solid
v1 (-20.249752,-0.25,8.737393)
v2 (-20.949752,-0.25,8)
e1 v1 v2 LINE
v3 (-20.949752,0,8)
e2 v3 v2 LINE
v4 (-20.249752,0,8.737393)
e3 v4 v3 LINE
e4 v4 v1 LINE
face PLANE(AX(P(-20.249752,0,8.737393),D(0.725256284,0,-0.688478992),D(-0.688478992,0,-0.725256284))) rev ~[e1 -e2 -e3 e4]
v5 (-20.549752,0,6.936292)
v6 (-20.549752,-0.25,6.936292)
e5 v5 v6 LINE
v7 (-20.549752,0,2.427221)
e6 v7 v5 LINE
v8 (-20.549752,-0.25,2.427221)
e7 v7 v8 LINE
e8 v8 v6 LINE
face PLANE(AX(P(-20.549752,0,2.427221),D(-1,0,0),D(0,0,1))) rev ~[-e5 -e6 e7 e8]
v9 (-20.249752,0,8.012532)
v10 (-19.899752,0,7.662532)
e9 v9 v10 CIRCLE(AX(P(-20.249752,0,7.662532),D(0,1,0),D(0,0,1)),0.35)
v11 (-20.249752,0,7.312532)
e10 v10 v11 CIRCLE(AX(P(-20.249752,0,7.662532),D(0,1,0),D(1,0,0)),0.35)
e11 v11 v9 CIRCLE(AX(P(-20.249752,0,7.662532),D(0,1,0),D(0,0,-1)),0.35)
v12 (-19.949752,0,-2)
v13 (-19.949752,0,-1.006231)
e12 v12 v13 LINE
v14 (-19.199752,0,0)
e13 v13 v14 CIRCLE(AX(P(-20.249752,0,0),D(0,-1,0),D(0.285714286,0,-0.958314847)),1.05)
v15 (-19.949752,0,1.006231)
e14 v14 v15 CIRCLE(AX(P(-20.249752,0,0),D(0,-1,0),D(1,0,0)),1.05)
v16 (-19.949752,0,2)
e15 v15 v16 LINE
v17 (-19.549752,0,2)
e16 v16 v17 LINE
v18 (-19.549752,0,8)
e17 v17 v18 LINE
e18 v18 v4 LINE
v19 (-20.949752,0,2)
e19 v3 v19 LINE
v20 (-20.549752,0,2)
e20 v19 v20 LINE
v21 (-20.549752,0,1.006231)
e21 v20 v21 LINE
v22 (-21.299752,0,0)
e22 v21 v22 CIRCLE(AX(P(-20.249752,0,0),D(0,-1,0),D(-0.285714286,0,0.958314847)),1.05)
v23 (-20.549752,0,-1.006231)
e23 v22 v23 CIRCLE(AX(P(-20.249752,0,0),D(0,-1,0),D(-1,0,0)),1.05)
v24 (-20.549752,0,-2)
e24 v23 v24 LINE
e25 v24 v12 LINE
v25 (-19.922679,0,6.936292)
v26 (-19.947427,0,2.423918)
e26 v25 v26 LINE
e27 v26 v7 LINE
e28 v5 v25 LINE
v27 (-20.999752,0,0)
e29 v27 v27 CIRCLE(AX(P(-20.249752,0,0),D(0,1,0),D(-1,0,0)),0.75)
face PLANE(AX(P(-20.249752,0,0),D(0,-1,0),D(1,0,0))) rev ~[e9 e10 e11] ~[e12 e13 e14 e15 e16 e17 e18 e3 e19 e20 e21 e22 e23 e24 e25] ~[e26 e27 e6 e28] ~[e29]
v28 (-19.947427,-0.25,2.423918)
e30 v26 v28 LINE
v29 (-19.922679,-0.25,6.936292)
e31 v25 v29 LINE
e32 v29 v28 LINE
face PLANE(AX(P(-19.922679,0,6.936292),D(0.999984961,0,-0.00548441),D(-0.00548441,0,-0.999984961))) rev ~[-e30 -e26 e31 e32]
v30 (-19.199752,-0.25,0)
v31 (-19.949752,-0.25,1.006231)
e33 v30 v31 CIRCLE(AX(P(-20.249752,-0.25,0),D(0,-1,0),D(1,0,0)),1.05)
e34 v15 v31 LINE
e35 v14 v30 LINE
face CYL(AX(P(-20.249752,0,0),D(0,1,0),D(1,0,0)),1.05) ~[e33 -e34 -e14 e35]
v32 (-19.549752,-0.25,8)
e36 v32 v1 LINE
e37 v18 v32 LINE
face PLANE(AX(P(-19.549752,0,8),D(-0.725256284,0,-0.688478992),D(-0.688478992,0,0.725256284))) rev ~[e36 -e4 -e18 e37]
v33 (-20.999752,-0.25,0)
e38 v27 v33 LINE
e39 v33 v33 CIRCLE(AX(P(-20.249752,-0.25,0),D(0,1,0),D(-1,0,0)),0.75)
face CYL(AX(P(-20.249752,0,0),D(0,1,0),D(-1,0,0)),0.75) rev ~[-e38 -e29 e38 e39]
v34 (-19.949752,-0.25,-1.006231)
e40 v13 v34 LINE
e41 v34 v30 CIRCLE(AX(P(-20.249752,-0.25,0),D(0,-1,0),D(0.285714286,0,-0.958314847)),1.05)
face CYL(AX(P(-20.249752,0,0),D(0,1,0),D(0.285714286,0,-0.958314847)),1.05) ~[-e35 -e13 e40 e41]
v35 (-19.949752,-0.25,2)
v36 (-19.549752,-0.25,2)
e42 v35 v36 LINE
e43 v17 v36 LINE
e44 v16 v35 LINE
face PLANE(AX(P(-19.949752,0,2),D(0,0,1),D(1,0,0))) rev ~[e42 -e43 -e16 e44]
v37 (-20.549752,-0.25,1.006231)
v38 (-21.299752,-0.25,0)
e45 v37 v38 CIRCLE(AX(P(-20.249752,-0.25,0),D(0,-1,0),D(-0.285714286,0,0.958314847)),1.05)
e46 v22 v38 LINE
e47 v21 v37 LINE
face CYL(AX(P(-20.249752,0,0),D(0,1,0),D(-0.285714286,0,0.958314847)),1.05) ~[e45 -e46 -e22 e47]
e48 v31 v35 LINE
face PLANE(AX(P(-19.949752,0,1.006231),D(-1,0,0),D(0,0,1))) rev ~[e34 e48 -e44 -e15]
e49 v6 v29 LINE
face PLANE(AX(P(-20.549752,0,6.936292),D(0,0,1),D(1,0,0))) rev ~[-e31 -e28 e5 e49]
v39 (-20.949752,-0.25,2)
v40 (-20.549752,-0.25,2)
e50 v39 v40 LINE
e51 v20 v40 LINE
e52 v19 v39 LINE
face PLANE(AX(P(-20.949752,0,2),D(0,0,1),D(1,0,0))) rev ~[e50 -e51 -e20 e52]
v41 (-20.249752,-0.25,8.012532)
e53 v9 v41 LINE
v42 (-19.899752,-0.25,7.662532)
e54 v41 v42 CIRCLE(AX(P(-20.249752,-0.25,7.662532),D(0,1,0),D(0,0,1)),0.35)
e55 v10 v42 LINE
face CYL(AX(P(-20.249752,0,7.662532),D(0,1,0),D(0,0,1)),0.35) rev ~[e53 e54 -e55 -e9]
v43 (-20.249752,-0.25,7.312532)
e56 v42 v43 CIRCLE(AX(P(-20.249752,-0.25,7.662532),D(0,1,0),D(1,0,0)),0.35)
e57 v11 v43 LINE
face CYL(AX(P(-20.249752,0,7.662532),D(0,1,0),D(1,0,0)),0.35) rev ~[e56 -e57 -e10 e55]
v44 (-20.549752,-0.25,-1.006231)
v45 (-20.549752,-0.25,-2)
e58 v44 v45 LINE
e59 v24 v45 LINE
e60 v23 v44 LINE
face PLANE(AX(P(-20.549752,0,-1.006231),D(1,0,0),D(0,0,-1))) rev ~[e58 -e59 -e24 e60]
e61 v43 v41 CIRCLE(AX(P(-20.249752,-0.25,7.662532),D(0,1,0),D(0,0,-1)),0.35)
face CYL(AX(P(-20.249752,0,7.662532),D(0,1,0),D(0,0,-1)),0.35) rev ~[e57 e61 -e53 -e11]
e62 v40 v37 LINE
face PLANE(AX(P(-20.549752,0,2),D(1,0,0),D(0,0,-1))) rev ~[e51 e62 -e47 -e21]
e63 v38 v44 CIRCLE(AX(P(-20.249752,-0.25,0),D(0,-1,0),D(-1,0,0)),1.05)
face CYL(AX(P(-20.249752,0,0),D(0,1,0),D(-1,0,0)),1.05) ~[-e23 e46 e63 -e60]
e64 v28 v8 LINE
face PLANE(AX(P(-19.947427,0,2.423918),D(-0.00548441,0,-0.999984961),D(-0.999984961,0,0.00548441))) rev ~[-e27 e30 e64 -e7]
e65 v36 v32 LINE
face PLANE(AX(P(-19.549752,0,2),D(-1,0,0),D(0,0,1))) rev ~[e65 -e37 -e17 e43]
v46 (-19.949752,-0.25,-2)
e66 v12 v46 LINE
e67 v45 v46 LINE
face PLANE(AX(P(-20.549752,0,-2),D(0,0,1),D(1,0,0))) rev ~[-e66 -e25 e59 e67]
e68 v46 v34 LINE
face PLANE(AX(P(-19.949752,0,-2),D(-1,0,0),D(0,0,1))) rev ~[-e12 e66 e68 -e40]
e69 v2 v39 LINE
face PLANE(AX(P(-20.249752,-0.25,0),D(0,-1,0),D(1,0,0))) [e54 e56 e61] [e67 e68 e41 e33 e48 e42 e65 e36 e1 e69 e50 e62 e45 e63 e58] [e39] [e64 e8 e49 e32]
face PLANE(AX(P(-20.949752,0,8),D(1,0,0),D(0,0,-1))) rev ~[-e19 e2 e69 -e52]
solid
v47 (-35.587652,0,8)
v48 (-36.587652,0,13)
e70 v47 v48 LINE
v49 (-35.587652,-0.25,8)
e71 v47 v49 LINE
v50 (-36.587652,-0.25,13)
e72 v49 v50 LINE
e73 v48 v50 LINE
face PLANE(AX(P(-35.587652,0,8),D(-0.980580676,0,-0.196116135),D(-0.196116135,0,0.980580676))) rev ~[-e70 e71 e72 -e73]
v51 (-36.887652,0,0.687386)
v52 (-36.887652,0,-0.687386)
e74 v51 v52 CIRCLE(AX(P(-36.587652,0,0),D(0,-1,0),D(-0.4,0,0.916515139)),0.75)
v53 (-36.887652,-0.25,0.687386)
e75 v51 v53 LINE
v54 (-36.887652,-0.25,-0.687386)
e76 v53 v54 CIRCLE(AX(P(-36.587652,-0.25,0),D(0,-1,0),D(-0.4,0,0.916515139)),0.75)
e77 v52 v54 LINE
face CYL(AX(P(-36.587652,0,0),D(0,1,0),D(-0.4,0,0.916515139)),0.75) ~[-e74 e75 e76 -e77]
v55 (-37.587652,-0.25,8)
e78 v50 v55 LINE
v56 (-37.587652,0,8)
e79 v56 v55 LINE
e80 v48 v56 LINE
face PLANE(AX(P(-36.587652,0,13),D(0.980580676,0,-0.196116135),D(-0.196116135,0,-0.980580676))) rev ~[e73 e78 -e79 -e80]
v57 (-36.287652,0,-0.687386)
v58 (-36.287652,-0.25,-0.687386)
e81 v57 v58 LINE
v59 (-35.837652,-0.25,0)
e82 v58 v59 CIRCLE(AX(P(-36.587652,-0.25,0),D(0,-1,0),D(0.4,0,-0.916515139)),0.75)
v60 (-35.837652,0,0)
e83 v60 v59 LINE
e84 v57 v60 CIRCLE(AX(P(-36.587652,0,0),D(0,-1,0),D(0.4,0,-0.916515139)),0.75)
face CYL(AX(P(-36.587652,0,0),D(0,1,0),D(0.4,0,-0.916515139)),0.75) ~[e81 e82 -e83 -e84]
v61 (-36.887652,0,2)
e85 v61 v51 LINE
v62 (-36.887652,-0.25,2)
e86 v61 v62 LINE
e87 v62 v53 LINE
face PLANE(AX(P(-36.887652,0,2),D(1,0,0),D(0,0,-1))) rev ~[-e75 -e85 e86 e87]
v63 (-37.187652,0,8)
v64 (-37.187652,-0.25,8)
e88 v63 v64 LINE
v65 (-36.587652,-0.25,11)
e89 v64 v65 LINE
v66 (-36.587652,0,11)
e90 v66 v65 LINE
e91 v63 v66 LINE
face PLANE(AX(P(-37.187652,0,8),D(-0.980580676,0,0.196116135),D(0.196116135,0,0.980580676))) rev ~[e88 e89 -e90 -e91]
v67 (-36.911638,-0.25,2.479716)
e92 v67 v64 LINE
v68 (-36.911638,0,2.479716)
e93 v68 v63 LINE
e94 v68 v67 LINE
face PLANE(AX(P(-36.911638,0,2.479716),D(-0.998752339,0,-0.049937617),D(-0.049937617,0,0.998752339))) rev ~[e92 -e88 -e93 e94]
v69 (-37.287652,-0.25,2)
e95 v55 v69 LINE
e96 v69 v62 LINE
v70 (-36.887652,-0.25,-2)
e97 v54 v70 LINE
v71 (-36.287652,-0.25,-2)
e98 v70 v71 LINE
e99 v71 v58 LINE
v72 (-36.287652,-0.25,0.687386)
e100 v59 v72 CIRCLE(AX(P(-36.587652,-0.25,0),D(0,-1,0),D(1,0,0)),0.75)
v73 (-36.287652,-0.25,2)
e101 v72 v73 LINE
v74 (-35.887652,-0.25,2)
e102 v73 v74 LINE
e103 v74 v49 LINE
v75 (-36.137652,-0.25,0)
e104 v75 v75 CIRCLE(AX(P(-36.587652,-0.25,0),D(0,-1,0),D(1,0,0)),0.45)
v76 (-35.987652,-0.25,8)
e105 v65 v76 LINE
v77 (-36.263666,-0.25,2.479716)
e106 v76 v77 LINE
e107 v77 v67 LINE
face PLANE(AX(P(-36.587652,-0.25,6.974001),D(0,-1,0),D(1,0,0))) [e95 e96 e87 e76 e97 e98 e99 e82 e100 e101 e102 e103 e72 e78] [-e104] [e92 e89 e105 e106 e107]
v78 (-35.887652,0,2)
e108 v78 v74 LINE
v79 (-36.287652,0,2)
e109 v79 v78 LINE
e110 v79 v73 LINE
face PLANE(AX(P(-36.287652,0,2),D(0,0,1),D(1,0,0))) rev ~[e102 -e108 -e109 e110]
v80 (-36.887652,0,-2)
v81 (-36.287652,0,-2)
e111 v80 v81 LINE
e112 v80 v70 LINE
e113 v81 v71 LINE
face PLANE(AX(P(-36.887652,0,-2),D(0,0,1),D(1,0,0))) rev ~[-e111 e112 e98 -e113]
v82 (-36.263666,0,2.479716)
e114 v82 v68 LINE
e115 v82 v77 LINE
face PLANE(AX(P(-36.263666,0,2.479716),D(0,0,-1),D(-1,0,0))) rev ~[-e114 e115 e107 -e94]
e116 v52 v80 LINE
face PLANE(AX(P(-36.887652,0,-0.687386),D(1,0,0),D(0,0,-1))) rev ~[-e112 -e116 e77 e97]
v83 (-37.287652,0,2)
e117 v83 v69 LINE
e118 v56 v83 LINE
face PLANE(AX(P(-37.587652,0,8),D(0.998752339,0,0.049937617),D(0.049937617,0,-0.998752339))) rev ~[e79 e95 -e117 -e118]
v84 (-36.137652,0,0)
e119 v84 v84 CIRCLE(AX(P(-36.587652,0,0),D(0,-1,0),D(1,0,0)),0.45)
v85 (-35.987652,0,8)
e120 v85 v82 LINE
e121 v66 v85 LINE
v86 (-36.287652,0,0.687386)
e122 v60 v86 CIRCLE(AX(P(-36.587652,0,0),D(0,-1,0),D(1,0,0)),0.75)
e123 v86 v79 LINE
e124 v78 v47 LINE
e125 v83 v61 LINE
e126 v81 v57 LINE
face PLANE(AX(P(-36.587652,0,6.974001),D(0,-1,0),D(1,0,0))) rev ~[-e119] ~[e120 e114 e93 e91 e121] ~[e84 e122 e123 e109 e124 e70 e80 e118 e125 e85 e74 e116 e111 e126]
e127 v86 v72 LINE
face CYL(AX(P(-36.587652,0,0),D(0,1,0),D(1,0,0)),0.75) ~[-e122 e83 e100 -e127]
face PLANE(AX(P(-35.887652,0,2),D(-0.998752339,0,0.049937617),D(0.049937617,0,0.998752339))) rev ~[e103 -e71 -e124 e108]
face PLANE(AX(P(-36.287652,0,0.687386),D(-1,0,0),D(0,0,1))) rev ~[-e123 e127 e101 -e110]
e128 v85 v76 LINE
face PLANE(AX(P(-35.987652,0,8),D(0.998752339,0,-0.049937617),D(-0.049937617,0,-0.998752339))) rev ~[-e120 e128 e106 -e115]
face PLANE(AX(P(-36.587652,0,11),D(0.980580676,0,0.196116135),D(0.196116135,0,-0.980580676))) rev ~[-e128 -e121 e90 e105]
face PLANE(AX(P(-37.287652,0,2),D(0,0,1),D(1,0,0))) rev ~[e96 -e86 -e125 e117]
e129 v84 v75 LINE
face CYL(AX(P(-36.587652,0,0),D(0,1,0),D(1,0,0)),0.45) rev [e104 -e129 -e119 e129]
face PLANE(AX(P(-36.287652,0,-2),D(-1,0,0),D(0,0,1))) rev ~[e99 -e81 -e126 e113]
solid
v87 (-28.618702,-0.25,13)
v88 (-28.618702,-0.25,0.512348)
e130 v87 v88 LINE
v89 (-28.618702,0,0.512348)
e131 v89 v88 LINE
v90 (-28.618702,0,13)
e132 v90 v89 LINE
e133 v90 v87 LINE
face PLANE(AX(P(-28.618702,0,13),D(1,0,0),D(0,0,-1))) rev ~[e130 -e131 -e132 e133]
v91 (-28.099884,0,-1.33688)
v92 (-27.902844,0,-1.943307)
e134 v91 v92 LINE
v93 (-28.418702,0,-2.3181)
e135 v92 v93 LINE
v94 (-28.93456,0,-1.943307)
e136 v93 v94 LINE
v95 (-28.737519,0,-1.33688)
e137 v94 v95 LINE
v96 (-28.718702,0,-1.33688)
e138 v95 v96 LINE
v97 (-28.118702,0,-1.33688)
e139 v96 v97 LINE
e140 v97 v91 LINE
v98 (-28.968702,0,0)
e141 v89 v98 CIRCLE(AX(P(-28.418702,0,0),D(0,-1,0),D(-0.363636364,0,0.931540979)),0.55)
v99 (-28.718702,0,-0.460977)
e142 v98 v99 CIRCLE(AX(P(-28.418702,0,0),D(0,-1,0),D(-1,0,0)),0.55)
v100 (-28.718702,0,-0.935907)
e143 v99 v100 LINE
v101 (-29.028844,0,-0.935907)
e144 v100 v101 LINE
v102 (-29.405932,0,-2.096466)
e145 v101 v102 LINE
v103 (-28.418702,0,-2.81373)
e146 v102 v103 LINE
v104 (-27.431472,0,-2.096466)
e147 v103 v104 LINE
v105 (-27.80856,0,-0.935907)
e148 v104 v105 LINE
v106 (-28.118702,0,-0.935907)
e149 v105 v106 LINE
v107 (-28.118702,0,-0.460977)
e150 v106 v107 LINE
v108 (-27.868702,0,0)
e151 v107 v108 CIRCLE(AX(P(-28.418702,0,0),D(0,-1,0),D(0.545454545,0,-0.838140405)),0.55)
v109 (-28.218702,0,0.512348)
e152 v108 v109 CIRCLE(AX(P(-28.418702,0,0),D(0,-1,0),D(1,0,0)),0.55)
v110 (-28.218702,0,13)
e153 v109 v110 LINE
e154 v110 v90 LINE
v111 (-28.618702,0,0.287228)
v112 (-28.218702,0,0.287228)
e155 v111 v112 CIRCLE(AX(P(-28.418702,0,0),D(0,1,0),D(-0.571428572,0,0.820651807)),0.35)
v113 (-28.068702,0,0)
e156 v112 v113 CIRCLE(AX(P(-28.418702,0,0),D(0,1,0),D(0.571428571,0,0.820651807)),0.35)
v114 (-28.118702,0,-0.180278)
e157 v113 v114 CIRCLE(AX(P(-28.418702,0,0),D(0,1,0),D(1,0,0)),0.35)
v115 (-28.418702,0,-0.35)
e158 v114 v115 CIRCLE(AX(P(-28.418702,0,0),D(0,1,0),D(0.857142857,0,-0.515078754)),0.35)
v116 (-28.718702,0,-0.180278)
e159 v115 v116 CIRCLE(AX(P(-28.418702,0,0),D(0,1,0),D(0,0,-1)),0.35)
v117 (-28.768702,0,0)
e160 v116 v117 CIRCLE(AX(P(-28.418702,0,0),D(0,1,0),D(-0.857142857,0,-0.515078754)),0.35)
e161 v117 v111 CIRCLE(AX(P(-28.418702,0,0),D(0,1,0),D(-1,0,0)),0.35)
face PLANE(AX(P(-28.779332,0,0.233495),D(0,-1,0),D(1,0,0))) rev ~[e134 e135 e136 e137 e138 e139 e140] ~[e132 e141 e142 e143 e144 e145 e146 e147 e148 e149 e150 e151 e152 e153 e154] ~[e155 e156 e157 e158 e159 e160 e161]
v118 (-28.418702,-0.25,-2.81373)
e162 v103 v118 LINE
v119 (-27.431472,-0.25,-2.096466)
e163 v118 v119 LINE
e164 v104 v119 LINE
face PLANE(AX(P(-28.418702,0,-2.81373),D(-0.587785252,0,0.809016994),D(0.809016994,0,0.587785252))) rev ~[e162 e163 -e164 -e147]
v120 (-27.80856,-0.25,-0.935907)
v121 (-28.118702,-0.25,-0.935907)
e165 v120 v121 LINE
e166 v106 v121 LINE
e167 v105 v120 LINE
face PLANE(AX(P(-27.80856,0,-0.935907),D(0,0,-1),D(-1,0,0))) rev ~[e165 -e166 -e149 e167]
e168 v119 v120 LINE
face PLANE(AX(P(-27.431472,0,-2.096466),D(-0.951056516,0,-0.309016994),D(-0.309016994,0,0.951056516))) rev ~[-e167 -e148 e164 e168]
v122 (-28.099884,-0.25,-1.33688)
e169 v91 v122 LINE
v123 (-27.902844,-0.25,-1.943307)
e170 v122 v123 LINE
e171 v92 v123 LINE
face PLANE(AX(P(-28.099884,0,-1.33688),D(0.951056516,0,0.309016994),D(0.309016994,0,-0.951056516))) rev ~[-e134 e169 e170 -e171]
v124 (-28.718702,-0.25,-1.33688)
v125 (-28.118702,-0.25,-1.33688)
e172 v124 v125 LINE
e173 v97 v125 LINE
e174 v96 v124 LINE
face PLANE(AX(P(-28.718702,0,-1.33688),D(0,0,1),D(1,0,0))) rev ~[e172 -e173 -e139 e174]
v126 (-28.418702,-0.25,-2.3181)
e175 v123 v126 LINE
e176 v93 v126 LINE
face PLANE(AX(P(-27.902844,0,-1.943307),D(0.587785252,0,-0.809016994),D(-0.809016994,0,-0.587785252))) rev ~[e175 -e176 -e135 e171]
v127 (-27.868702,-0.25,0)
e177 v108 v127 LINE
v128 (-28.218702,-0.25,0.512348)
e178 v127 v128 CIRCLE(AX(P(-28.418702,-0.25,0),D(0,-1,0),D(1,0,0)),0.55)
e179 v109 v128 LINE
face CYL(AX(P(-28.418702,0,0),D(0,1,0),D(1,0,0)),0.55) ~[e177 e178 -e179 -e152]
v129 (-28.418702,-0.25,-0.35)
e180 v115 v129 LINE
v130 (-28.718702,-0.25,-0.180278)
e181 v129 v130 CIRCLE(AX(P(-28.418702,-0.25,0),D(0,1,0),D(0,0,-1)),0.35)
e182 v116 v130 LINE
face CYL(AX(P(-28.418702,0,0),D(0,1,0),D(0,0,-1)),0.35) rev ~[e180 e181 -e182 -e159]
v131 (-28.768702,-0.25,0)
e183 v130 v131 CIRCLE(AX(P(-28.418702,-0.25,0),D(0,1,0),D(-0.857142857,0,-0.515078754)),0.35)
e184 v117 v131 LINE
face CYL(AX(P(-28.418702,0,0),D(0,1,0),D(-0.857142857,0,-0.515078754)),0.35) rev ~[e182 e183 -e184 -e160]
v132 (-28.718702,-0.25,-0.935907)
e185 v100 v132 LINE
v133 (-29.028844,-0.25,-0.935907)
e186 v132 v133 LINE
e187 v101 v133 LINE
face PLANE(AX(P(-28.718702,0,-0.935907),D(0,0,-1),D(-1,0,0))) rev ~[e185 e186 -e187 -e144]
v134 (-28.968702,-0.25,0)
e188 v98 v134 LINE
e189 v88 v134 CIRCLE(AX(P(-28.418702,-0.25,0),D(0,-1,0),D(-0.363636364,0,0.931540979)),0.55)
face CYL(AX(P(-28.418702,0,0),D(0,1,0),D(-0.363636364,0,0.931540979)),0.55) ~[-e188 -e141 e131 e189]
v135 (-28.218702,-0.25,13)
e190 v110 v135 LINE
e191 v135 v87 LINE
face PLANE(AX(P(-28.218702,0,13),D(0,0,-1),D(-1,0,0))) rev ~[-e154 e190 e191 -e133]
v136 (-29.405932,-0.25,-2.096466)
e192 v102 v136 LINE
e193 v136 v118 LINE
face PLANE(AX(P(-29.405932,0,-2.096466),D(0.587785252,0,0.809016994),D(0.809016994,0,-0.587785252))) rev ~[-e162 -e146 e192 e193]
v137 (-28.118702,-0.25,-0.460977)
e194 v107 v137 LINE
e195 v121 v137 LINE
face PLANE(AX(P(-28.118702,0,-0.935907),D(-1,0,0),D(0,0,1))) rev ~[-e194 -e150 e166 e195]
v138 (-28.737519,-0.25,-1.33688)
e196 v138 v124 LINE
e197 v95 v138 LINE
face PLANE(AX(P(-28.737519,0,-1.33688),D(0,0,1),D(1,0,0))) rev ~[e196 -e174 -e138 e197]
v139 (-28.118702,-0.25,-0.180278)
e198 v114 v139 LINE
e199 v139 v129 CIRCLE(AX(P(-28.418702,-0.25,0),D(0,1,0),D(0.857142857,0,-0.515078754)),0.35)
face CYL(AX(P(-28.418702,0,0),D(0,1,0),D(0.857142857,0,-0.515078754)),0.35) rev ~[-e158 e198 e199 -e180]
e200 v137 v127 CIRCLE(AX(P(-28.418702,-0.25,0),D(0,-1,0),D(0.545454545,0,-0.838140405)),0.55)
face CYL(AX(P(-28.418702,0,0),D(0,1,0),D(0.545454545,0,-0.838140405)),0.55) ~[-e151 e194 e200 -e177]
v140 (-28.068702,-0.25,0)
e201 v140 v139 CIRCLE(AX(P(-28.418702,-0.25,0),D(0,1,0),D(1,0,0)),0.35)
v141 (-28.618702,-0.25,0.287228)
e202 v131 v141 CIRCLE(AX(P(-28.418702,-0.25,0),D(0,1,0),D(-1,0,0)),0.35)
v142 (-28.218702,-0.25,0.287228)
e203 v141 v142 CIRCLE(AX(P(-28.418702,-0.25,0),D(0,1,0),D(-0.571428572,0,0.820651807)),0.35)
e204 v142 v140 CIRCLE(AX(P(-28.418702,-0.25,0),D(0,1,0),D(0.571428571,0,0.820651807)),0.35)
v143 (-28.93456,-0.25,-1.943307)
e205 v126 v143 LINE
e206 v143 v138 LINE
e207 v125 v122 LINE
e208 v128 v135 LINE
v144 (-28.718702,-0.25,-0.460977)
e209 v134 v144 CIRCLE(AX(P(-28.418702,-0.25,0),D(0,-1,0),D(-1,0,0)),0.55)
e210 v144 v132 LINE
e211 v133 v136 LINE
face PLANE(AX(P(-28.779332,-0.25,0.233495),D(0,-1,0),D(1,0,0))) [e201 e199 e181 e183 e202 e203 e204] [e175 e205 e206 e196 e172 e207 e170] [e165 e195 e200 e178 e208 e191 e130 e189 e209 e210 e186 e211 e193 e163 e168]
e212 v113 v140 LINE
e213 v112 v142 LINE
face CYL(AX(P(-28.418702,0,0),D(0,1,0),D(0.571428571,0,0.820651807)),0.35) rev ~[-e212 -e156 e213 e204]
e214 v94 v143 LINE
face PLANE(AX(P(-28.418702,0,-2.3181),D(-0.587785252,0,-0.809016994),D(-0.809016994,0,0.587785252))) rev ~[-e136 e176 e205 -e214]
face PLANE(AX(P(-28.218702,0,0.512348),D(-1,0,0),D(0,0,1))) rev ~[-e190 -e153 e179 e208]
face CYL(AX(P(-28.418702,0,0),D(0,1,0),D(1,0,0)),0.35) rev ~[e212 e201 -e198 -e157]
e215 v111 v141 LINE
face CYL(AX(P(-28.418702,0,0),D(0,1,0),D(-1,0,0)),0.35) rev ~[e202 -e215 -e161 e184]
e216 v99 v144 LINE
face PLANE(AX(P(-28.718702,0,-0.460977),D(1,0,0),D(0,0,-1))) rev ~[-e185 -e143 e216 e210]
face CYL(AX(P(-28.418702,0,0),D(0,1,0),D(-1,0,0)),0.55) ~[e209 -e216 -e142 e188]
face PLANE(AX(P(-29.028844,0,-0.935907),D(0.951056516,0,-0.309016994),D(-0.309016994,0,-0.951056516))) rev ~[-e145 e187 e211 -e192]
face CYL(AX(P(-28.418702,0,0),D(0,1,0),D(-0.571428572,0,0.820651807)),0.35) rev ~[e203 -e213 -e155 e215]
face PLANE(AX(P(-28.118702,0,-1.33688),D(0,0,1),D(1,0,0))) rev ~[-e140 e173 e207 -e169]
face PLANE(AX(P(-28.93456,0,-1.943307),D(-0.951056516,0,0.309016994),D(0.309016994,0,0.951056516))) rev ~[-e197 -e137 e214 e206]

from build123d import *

# Parameters (mm, degrees)
F1_DEPTH = 0.25
F0_W     = 0.3
F0_H     = 0.4009734839
F0_R     = 0.45


# Not quite as in the source:
# - a feature names something its author has since deleted; it is built from what else it names


with BuildPart() as f1:
    # F0 (on Front) → F1 (new body)
    with BuildSketch(Plane.XZ):
        with BuildLine():
            ThreePointArc((-20.5497518182, 1.0062305899), (-21.0916247302, 0.6274950199), (-21.2997518182, 0))
            ThreePointArc((-21.2997518182, 0), (-21.0916247302, -0.6274950199), (-20.5497518182, -1.0062305899))
            ThreePointArc((-20.5497518182, -1.0062305899), (-20.2497518182, -1.05), (-19.9497518182, -1.0062305899))
            ThreePointArc((-19.9497518182, -1.0062305899), (-19.4078789062, -0.6274950199), (-19.1997518182, 0))
            ThreePointArc((-19.1997518182, 0), (-19.4078789062, 0.6274950199), (-19.9497518182, 1.0062305899))
            ThreePointArc((-19.9497518182, 1.0062305899), (-20.2497518182, 1.05), (-20.5497518182, 1.0062305899))
        make_face()
        with BuildLine():
            ThreePointArc((-19.4997518182, 0), (-20.2497518182, -0.75), (-20.9997518182, 0))
            ThreePointArc((-20.9997518182, 0), (-20.2497518182, 0.75), (-19.4997518182, 0))
        make_face(mode=Mode.SUBTRACT)
        with BuildLine():
            Line((-20.5497518182, 2), (-20.5497518182, 1.0062305899))
            ThreePointArc((-20.5497518182, 1.0062305899), (-20.2497518182, 1.05), (-19.9497518182, 1.0062305899))
            Line((-19.9497518182, 1.0062305899), (-19.9497518182, 2))
            Line((-19.9497518182, 2), (-19.9474268439, 2.4239178289))
            Line((-19.9474268439, 2.4239178289), (-20.5497518182, 2.4272212759))
            Line((-20.5497518182, 2.4272212759), (-20.5497518182, 2))
        make_face()
        with BuildLine():
            ThreePointArc((-19.9497518182, -1.0062305899), (-20.2497518182, -1.05), (-20.5497518182, -1.0062305899))
            Line((-20.5497518182, -1.0062305899), (-20.5497518182, -2))
            Line((-20.5497518182, -2), (-19.9497518182, -2))
            Line((-19.9497518182, -2), (-19.9497518182, -1.0062305899))
        make_face()
        with BuildLine():
            Line((-20.9497518182, 2), (-20.5497518182, 2))
            Line((-20.5497518182, 2), (-20.5497518182, 2.4272212759))
            Line((-20.5497518182, 2.4272212759), (-20.5497518182, 6.936291784))
            Line((-20.5497518182, 6.936291784), (-20.2497518182, 6.936291784))
            Line((-20.2497518182, 6.936291784), (-20.2497518182, 7.3125319198))
            ThreePointArc((-20.2497518182, 7.3125319198), (-20.5997518182, 7.6625319198), (-20.2497518182, 8.0125319198))
            Line((-20.2497518182, 8.0125319198), (-20.2497518182, 8.7373927236))
            Line((-20.2497518182, 8.7373927236), (-20.9497518182, 8))
            Line((-20.9497518182, 8), (-20.9497518182, 2))
        make_face()
        with BuildLine():
            Line((-19.9474268439, 2.4239178289), (-19.9497518182, 2))
            Line((-19.9497518182, 2), (-19.5497518182, 2))
            Line((-19.5497518182, 2), (-19.5497518182, 8))
            Line((-19.5497518182, 8), (-20.2497518182, 8.7373927236))
            Line((-20.2497518182, 8.7373927236), (-20.2497518182, 8.0125319198))
            ThreePointArc((-20.2497518182, 8.0125319198), (-20.0022644448, 7.9100192932), (-19.8997518182, 7.6625319198))
            ThreePointArc((-19.8997518182, 7.6625319198), (-20.0022644448, 7.4150445464), (-20.2497518182, 7.3125319198))
            Line((-20.2497518182, 7.3125319198), (-20.2497518182, 6.936291784))
            Line((-20.2497518182, 6.936291784), (-19.9226787618, 6.936291784))
            Line((-19.9226787618, 6.936291784), (-19.9474268439, 2.4239178289))
        make_face()
    extrude(amount=F1_DEPTH)


with BuildPart() as f1b:
    # F0 (on Front) → F1, piece 2 (new body)
    with BuildSketch(Plane.XZ):
        with BuildLine():
            ThreePointArc((-28.6187018186, 0.5123475383), (-28.8728493717, 0.3102418412), (-28.9687018186, 0))
            Line((-28.9687018186, 0), (-28.7687018186, 0))
            ThreePointArc((-28.7687018186, 0), (-28.7289436597, 0.1620185175), (-28.6187018186, 0.2872281323))
            Line((-28.6187018186, 0.2872281323), (-28.6187018186, 0.5123475383))
        make_face()
        with BuildLine():
            Line((-28.7687018186, 0), (-28.9687018186, 0))
            ThreePointArc((-28.9687018186, 0), (-28.9021788087, -0.262202212), (-28.7187018186, -0.4609772229))
            Line((-28.7187018186, -0.4609772229), (-28.7187018186, -0.1802775638))
            ThreePointArc((-28.7187018186, -0.1802775638), (-28.7559702577, -0.0935414347), (-28.7687018186, 0))
        make_face()
        with BuildLine():
            Line((-28.6187018186, 13), (-28.6187018186, 0.5123475383))
            ThreePointArc((-28.6187018186, 0.5123475383), (-28.4187018186, 0.55), (-28.2187018186, 0.5123475383))
            Line((-28.2187018186, 0.5123475383), (-28.2187018186, 13))
            Line((-28.2187018186, 13), (-28.6187018186, 13))
        make_face()
        with BuildLine():
            ThreePointArc((-28.2187018186, 0.5123475383), (-28.4187018186, 0.55), (-28.6187018186, 0.5123475383))
            Line((-28.6187018186, 0.5123475383), (-28.6187018186, 0.2872281323))
            ThreePointArc((-28.6187018186, 0.2872281323), (-28.4187018186, 0.35), (-28.2187018186, 0.2872281323))
            Line((-28.2187018186, 0.2872281323), (-28.2187018186, 0.5123475383))
        make_face()
        with BuildLine():
            Line((-28.7187018186, -0.1802775638), (-28.7187018186, -0.4609772229))
            ThreePointArc((-28.7187018186, -0.4609772229), (-28.5751667147, -0.5272748205), (-28.4187018186, -0.55))
            Line((-28.4187018186, -0.55), (-28.4187018186, -0.35))
            ThreePointArc((-28.4187018186, -0.35), (-28.5910428362, -0.3046285831), (-28.7187018186, -0.1802775638))
        make_face()
        with BuildLine():
            ThreePointArc((-28.4187018186, -0.55), (-28.5751667147, -0.5272748205), (-28.7187018186, -0.4609772229))
            Line((-28.7187018186, -0.4609772229), (-28.7187018186, -0.9359067772))
            Line((-28.7187018186, -0.9359067772), (-28.4187018186, -0.9359067772))
            Line((-28.4187018186, -0.9359067772), (-28.4187018186, -0.55))
        make_face()
        with BuildLine():
            ThreePointArc((-27.8687018186, 0), (-27.9645542655, 0.3102418411), (-28.2187018186, 0.5123475383))
            Line((-28.2187018186, 0.5123475383), (-28.2187018186, 0.2872281323))
            ThreePointArc((-28.2187018186, 0.2872281323), (-28.1084599774, 0.1620185175), (-28.0687018186, 0))
            Line((-28.0687018186, 0), (-27.8687018186, 0))
        make_face()
        with BuildLine():
            Line((-28.4187018186, -0.35), (-28.4187018186, -0.55))
            ThreePointArc((-28.4187018186, -0.55), (-28.2622369225, -0.5272748205), (-28.1187018186, -0.4609772229))
            Line((-28.1187018186, -0.4609772229), (-28.1187018186, -0.1802775638))
            ThreePointArc((-28.1187018186, -0.1802775638), (-28.246360801, -0.3046285831), (-28.4187018186, -0.35))
        make_face()
        with BuildLine():
            ThreePointArc((-28.1187018186, -0.4609772229), (-28.2622369225, -0.5272748205), (-28.4187018186, -0.55))
            Line((-28.4187018186, -0.55), (-28.4187018186, -0.9359067772))
            Line((-28.4187018186, -0.9359067772), (-28.1187018186, -0.9359067772))
            Line((-28.1187018186, -0.9359067772), (-28.1187018186, -0.4609772229))
        make_face()
        with Locations((-28.5687018186, -1.1363935191)):
            Rectangle(F0_W, F0_H)
        Polygon((-28.7187018186, -1.3368802611), (-28.7187018186, -0.9359067772), (-29.0288436917, -0.9359067772), (-29.4059321072, -2.0964655857), (-28.4187018186, -2.8137303753), (-28.4187018186, -2.318099892), (-28.9345595064, -1.9433073434), (-28.737519403, -1.3368802611), align=None)
        with BuildLine():
            ThreePointArc((-28.1187018186, -0.4609772229), (-27.9352248284, -0.262202212), (-27.8687018186, 0))
            Line((-27.8687018186, 0), (-28.0687018186, 0))
            ThreePointArc((-28.0687018186, 0), (-28.0814333795, -0.0935414347), (-28.1187018186, -0.1802775638))
            Line((-28.1187018186, -0.1802775638), (-28.1187018186, -0.4609772229))
        make_face()
        with Locations((-28.2687018186, -1.1363935191)):
            Rectangle(F0_W, F0_H)
        Polygon((-27.8085599455, -0.9359067772), (-28.1187018186, -0.9359067772), (-28.1187018186, -1.3368802611), (-28.0998842342, -1.3368802611), (-27.9028441308, -1.9433073434), (-28.4187018186, -2.318099892), (-28.4187018186, -2.8137303753), (-27.43147153, -2.0964655857), align=None)
    extrude(amount=F1_DEPTH)


with BuildPart() as f1c:
    # F0 (on Front) → F1, piece 3 (new body)
    with BuildSketch(Plane.XZ):
        Polygon((-35.587651819, 8), (-36.587651819, 13), (-37.587651819, 8), (-37.287651819, 2), (-36.887651819, 2), (-36.9116376011, 2.4797156414), (-37.187651819, 8), (-36.587651819, 11), (-35.987651819, 8), (-36.2636660369, 2.4797156414), (-36.287651819, 2), (-35.887651819, 2), align=None)
        with BuildLine():
            Line((-36.287651819, 0.6873863542), (-36.287651819, 2))
            Line((-36.287651819, 2), (-36.887651819, 2))
            Line((-36.887651819, 2), (-36.887651819, 0.6873863542))
            ThreePointArc((-36.887651819, 0.6873863542), (-36.587651819, 0.75), (-36.287651819, 0.6873863542))
        make_face()
        Polygon((-36.887651819, 2), (-36.287651819, 2), (-36.2636660369, 2.4797156414), (-36.9116376011, 2.4797156414), align=None)
        with BuildLine():
            ThreePointArc((-35.837651819, 0), (-35.9601567991, 0.4107919181), (-36.287651819, 0.6873863542))
            ThreePointArc((-36.287651819, 0.6873863542), (-36.587651819, 0.75), (-36.887651819, 0.6873863542))
            ThreePointArc((-36.887651819, 0.6873863542), (-37.337651819, 0), (-36.887651819, -0.6873863542))
            ThreePointArc((-36.887651819, -0.6873863542), (-36.587651819, -0.75), (-36.287651819, -0.6873863542))
            ThreePointArc((-36.287651819, -0.6873863542), (-35.9601567991, -0.4107919181), (-35.837651819, 0))
        make_face()
        with Locations((-36.587651819, 0)):
            Circle(F0_R, mode=Mode.SUBTRACT)
        with BuildLine():
            ThreePointArc((-36.287651819, -0.6873863542), (-36.587651819, -0.75), (-36.887651819, -0.6873863542))
            Line((-36.887651819, -0.6873863542), (-36.887651819, -2))
            Line((-36.887651819, -2), (-36.287651819, -2))
            Line((-36.287651819, -2), (-36.287651819, -0.6873863542))
        make_face()
    extrude(amount=F1_DEPTH)


solid = Compound([f1.part, f1b.part, f1c.part])
